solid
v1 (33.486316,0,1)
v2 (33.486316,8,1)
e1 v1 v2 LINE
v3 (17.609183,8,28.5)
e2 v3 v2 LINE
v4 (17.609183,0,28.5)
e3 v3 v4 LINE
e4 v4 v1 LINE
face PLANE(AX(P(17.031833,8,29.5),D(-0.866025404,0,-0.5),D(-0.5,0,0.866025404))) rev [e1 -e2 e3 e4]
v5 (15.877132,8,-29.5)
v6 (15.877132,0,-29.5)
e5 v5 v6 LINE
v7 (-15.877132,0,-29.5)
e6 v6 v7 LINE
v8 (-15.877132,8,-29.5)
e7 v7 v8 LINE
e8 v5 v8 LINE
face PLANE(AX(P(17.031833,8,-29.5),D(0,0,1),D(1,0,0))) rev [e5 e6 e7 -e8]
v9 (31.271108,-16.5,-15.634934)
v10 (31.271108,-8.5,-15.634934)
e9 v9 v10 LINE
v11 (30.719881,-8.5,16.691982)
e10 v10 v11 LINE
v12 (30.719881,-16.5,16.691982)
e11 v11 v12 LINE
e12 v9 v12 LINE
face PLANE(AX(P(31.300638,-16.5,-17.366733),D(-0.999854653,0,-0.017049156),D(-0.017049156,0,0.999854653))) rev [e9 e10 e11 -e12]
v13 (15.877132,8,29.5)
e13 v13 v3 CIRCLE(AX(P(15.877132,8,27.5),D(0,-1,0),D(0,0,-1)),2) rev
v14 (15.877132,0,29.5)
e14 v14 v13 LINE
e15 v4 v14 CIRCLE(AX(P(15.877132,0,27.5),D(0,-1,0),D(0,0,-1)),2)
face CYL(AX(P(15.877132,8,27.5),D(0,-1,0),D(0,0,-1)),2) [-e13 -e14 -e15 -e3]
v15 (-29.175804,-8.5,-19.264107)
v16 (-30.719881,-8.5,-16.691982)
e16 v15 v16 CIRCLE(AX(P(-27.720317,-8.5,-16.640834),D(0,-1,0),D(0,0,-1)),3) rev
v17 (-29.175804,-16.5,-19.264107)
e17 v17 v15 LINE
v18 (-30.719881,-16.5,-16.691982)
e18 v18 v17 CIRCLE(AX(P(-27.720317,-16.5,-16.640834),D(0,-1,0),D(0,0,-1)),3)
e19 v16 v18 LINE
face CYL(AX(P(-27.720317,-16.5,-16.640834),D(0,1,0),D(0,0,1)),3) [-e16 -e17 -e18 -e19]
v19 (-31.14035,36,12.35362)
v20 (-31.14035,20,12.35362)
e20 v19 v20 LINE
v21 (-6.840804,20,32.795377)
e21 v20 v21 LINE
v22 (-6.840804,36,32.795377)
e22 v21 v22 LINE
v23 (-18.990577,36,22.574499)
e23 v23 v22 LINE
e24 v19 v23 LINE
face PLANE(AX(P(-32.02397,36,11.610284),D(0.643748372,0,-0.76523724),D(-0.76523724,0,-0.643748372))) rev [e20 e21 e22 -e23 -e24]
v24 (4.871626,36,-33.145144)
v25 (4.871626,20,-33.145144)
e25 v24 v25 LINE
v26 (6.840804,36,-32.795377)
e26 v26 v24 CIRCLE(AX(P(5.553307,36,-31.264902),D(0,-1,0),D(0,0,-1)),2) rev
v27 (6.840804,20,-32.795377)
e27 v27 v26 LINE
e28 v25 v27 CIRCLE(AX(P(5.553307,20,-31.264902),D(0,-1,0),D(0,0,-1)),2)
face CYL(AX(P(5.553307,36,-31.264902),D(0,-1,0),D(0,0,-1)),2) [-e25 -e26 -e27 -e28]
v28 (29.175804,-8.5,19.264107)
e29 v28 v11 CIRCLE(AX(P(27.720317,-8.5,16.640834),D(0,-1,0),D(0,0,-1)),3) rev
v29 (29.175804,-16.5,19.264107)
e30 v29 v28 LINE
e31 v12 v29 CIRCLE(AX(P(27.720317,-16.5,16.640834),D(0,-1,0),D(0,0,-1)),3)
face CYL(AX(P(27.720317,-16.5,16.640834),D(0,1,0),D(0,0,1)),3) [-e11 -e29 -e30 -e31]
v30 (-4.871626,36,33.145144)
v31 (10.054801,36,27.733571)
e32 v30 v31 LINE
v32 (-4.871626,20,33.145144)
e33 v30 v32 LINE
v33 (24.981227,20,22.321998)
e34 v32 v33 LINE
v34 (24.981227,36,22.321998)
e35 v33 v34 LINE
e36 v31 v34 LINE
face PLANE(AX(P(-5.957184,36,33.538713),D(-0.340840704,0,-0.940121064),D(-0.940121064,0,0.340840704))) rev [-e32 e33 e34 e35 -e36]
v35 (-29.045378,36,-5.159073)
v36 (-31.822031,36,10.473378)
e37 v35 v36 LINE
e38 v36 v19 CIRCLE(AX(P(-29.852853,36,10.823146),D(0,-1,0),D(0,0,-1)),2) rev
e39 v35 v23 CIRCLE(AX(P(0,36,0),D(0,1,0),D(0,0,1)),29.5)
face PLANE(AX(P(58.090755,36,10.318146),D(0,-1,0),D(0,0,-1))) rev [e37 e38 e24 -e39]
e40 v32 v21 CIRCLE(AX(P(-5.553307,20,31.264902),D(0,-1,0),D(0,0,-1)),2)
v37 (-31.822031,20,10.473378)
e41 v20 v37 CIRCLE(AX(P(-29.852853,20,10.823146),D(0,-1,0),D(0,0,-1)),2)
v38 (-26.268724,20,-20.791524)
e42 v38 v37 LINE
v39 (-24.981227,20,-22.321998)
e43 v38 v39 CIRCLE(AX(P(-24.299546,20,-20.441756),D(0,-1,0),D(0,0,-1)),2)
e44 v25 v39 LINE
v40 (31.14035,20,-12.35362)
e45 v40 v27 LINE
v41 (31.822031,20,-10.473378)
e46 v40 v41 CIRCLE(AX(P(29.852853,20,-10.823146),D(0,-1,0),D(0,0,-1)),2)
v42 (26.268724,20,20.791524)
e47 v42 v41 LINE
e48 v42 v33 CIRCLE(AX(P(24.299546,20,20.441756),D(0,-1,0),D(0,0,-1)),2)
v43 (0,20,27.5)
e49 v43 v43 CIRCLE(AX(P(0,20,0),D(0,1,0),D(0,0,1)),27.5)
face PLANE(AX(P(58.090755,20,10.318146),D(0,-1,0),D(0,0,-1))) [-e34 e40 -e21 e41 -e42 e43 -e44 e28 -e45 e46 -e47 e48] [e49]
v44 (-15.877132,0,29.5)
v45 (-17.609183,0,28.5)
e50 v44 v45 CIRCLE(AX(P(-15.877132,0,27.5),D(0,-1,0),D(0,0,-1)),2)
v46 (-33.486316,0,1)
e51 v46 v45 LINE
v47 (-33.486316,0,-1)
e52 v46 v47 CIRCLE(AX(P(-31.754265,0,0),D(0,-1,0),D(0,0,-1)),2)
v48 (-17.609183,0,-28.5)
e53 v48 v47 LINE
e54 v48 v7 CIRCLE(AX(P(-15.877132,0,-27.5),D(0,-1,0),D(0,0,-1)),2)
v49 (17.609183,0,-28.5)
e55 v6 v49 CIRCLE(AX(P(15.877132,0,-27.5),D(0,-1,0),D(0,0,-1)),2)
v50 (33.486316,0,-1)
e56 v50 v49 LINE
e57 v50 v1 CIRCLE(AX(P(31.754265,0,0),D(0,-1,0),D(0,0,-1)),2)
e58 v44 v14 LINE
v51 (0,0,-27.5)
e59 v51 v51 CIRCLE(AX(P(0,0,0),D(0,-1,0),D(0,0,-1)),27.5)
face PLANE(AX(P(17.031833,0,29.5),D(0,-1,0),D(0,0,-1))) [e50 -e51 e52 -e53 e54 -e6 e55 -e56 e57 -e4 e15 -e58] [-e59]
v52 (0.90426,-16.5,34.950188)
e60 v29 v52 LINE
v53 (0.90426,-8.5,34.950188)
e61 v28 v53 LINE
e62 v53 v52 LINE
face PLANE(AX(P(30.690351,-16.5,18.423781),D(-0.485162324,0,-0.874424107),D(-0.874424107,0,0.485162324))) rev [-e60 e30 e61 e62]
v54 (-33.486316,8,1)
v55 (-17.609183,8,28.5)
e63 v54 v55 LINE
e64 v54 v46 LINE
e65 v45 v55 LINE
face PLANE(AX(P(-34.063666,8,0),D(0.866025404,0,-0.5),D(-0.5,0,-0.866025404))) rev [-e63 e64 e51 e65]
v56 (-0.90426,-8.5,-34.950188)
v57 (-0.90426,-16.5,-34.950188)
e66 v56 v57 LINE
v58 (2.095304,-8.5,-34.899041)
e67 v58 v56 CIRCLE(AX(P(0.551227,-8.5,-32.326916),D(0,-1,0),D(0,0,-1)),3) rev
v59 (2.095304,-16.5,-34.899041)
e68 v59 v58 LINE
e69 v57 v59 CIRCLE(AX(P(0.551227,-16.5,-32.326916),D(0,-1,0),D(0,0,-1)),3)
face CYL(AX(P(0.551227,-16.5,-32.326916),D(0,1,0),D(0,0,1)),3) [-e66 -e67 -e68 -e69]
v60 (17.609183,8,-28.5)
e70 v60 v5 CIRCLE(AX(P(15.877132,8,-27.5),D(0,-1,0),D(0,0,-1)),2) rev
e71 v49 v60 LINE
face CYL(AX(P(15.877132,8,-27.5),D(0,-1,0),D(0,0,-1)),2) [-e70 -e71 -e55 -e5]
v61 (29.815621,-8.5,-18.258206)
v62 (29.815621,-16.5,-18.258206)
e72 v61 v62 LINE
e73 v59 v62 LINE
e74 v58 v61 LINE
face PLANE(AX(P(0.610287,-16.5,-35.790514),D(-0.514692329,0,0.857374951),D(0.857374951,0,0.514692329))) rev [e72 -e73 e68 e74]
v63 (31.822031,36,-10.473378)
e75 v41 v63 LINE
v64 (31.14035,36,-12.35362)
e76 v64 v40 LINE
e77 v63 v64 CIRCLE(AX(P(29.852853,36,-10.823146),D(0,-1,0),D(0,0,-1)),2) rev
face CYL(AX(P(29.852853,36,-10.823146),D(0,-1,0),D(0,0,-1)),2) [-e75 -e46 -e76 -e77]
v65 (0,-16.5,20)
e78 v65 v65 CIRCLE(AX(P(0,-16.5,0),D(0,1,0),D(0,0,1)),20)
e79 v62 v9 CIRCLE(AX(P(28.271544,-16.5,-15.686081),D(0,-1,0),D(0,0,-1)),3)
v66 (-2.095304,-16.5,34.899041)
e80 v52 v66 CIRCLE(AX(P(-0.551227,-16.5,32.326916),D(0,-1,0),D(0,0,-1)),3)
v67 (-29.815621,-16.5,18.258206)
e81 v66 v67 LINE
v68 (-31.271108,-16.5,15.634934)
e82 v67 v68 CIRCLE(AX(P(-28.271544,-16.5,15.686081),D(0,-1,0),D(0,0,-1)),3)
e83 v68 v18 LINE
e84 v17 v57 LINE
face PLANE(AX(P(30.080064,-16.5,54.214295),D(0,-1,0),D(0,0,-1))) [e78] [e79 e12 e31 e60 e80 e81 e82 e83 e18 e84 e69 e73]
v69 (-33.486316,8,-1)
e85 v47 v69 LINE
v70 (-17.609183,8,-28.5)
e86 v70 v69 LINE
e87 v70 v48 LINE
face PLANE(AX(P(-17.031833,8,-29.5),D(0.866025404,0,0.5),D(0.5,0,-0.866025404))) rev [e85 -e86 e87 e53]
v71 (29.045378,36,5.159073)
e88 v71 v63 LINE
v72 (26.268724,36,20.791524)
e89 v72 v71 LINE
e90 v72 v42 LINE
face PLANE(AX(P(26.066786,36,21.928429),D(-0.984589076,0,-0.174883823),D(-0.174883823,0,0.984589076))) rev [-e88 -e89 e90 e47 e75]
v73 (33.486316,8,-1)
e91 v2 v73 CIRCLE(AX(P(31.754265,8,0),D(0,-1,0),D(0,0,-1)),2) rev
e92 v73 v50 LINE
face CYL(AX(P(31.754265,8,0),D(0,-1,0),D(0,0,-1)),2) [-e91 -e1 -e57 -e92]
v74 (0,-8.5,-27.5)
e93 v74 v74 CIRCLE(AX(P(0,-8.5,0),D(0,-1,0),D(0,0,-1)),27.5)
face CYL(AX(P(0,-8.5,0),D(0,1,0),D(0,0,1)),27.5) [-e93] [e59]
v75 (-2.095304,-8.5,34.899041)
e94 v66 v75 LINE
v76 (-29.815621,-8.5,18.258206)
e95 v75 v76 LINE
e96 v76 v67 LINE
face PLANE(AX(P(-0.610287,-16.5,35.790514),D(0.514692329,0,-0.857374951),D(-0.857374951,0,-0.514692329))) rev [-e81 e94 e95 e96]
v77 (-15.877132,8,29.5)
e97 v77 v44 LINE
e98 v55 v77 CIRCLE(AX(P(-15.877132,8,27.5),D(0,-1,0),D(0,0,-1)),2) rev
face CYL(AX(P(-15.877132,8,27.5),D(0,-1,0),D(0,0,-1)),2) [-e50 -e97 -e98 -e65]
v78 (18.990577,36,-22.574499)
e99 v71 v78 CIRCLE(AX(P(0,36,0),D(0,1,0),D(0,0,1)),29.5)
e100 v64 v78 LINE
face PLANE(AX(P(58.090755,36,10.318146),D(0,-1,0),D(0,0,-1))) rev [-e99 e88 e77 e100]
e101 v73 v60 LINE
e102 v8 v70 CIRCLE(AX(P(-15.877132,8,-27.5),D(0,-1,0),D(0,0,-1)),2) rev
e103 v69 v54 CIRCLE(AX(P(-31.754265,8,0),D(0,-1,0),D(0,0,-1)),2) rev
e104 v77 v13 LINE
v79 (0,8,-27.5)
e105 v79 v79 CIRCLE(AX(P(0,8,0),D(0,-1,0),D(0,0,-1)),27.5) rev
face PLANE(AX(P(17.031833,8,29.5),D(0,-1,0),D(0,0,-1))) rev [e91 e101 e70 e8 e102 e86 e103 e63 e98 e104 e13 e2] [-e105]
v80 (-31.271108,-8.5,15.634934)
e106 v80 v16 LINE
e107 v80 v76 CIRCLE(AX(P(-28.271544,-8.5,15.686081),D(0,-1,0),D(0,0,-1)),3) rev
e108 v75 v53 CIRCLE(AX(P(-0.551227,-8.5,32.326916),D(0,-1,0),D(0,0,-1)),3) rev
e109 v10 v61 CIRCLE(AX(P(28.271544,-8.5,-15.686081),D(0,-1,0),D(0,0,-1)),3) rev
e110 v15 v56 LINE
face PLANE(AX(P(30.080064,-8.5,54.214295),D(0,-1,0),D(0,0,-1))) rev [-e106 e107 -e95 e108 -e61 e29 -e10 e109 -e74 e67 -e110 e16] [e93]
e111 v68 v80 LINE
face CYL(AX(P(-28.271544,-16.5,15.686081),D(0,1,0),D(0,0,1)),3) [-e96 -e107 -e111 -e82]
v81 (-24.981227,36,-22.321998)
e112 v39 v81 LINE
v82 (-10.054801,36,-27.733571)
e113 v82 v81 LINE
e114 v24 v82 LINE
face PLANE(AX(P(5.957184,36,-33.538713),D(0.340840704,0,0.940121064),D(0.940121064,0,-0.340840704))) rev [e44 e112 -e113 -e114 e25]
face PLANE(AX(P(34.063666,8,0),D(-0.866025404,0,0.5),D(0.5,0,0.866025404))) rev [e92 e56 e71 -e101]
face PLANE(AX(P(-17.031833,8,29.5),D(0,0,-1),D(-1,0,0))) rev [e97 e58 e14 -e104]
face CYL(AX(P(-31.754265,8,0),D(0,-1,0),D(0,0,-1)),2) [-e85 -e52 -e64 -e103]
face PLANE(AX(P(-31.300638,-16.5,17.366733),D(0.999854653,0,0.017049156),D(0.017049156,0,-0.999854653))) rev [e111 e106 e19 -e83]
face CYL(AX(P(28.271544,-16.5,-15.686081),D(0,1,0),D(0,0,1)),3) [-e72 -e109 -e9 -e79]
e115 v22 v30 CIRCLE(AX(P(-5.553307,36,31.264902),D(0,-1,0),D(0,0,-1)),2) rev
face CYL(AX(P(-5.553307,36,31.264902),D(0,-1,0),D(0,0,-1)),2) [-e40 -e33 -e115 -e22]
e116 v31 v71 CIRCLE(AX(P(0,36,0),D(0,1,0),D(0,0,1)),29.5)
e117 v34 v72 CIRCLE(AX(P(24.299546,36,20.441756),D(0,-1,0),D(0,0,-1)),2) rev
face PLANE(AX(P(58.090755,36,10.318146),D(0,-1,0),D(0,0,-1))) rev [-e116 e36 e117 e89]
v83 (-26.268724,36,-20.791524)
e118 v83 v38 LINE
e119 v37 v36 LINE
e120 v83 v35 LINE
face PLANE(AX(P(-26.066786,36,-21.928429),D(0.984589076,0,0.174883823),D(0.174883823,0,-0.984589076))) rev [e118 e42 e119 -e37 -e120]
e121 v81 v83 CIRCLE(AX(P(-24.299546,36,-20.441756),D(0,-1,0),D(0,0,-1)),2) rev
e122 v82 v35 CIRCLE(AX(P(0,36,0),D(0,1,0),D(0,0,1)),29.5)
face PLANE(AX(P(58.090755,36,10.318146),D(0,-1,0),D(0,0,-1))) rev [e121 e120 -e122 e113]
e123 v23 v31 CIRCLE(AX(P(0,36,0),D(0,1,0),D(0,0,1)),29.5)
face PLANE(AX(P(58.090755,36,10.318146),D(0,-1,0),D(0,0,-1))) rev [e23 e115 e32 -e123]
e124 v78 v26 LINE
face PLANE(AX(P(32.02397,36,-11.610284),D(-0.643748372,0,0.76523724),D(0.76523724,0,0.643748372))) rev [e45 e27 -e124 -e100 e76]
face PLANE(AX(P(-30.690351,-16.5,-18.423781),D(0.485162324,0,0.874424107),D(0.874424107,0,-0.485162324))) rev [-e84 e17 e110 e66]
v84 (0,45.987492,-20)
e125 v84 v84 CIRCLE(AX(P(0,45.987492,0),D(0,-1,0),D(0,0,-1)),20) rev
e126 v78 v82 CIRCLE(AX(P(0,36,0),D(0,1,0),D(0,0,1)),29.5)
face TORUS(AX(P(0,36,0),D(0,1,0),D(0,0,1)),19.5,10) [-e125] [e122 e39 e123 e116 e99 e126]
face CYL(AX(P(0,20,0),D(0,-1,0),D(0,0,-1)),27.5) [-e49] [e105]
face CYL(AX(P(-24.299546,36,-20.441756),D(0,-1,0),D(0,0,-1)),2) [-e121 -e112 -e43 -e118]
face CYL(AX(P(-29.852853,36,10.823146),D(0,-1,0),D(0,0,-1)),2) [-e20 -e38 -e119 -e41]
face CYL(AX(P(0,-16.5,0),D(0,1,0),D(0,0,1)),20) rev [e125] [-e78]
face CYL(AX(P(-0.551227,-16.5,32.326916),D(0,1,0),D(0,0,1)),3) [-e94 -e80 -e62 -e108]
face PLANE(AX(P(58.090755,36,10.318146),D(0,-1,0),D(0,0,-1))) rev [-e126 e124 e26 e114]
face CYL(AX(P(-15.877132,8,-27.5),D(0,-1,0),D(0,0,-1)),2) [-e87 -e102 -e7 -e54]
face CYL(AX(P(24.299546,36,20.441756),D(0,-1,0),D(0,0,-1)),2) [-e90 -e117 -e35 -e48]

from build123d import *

# Parameters (mm, degrees)
EXTRUDE_1_DEPTH     = 8
SKETCH_2_R          = 27.5
EXTRUDE_2_DEPTH     = 12
EXTRUDE_3_DEPTH     = 16
SKETCH_4_R          = 29.5
EXTRUDE_4_DEPTH     = 10
FILLET_1_R          = 10
EXTRUDE_START       = 8.5
SKETCH_5_R          = 27.5
EXTRUDE_5_DEPTH     = 8.5
EXTRUDE_6_DEPTH     = 8
SKETCH_7_R          = 20
CUT_EXTRUDE_1_DEPTH = 80.671476808
FILLET_2_R          = 2
FILLET_3_R          = 2
FILLET_4_R          = 3


with BuildPart() as part:
    # Эскиз1 → Вытянуть1 (new body)
    with BuildSketch(Plane(origin=(0, 0, 0), x_dir=(1, 0, 0), z_dir=(0, 1, 0))):
        Polygon((34.063665882, 0), (17.031832941, 29.5), (-17.031832941, 29.5), (-34.063665882, 0), (-17.031832941, -29.5), (17.031832941, -29.5), align=None)
    extrude(amount=EXTRUDE_1_DEPTH)

    # Эскиз2 → Вытянуть2 (add)
    with BuildSketch(Plane(origin=(0, 8, 0), x_dir=(1, 0, 0), z_dir=(0, 1, 0))):
        with Locations(Location((0, 0, 0), (0, 0, 90))):
            Circle(SKETCH_2_R)
    extrude(amount=EXTRUDE_2_DEPTH)

    # Эскиз3 → Вытянуть3 (add)
    with BuildSketch(Plane(origin=(0, 20, 0), x_dir=(1, 0, 0), z_dir=(0, 1, 0))):
        Polygon((5.957184122, 33.538713313), (-26.066785678, 21.928429441), (-32.0239698, -11.610283872), (-5.957184122, -33.538713313), (26.066785678, -21.928429441), (32.0239698, 11.610283872), align=None)
    extrude(amount=EXTRUDE_3_DEPTH)

    # Эскиз4 → Вытянуть4 (add)
    with BuildSketch(Plane(origin=(0, 36, 0), x_dir=(1, 0, 0), z_dir=(0, 1, 0))):
        with Locations(Location((0, 0, 0), (0, 0, 109.92810259))):
            Circle(SKETCH_4_R)
    extrude(amount=EXTRUDE_4_DEPTH)

    # Скругление1
    fillet_1_edges = [part.edges().sort_by_distance(p)[0] for p in [
        (10.054800778, 46, 27.733571377),
    ]]
    fillet(fillet_1_edges, radius=FILLET_1_R - 0.0001)  # a hair under: the kernel refuses the full size

    # Эскиз5 → Вытянуть5 (add)
    with BuildSketch(Plane.XZ.offset(EXTRUDE_START)):
        with Locations(Location((0, 0, 0), (0, 0, 270))):
            Circle(SKETCH_5_R)
    extrude(amount=-EXTRUDE_5_DEPTH)

    # Эскиз6 → Вытянуть6 (add)
    with BuildSketch(Plane.XZ.offset(8.5)):
        Polygon((30.690350843, 18.423780786), (-0.610286773, 35.790513874), (-31.300637616, 17.366733088), (-30.690350843, -18.423780786), (0.610286773, -35.790513874), (31.300637616, -17.366733088), align=None)
    extrude(amount=EXTRUDE_6_DEPTH)

    # Эскиз7 → Вырез-Вытянуть1 (cut, through all)
    with BuildSketch(Plane(origin=(0, 46, 0), x_dir=(1, 0, 0), z_dir=(0, 1, 0))):
        with Locations(Location((0, 0, 0), (0, 0, 270))):
            Circle(SKETCH_7_R)
    extrude(amount=-CUT_EXTRUDE_1_DEPTH, mode=Mode.SUBTRACT)

    # Скругление2
    fillet_2_edges = [part.edges().sort_by_distance(p)[0] for p in [
        (32.0239698, 28, -11.610283872),
        (5.957184122, 28, -33.538713313),
        (-26.066785678, 28, -21.928429441),
        (-32.0239698, 28, 11.610283872),
        (-5.957184122, 28, 33.538713313),
        (26.066785678, 28, 21.928429441),
    ]]
    fillet(fillet_2_edges, radius=FILLET_2_R)

    # Скругление3
    fillet_3_edges = [part.edges().sort_by_distance(p)[0] for p in [
        (17.031832941, 4, 29.5),
        (-17.031832941, 4, 29.5),
        (-34.063665882, 4, 0),
        (-17.031832941, 4, -29.5),
        (17.031832941, 4, -29.5),
        (34.063665882, 4, 0),
    ]]
    fillet(fillet_3_edges, radius=FILLET_3_R)

    # Скругление4
    fillet_4_edges = [part.edges().sort_by_distance(p)[0] for p in [
        (31.300637616, -12.5, -17.366733088),
        (30.690350843, -12.5, 18.423780786),
        (-0.610286773, -12.5, 35.790513874),
        (-31.300637616, -12.5, 17.366733088),
        (-30.690350843, -12.5, -18.423780786),
        (0.610286773, -12.5, -35.790513874),
    ]]
    fillet(fillet_4_edges, radius=FILLET_4_R)


solid = part.part
